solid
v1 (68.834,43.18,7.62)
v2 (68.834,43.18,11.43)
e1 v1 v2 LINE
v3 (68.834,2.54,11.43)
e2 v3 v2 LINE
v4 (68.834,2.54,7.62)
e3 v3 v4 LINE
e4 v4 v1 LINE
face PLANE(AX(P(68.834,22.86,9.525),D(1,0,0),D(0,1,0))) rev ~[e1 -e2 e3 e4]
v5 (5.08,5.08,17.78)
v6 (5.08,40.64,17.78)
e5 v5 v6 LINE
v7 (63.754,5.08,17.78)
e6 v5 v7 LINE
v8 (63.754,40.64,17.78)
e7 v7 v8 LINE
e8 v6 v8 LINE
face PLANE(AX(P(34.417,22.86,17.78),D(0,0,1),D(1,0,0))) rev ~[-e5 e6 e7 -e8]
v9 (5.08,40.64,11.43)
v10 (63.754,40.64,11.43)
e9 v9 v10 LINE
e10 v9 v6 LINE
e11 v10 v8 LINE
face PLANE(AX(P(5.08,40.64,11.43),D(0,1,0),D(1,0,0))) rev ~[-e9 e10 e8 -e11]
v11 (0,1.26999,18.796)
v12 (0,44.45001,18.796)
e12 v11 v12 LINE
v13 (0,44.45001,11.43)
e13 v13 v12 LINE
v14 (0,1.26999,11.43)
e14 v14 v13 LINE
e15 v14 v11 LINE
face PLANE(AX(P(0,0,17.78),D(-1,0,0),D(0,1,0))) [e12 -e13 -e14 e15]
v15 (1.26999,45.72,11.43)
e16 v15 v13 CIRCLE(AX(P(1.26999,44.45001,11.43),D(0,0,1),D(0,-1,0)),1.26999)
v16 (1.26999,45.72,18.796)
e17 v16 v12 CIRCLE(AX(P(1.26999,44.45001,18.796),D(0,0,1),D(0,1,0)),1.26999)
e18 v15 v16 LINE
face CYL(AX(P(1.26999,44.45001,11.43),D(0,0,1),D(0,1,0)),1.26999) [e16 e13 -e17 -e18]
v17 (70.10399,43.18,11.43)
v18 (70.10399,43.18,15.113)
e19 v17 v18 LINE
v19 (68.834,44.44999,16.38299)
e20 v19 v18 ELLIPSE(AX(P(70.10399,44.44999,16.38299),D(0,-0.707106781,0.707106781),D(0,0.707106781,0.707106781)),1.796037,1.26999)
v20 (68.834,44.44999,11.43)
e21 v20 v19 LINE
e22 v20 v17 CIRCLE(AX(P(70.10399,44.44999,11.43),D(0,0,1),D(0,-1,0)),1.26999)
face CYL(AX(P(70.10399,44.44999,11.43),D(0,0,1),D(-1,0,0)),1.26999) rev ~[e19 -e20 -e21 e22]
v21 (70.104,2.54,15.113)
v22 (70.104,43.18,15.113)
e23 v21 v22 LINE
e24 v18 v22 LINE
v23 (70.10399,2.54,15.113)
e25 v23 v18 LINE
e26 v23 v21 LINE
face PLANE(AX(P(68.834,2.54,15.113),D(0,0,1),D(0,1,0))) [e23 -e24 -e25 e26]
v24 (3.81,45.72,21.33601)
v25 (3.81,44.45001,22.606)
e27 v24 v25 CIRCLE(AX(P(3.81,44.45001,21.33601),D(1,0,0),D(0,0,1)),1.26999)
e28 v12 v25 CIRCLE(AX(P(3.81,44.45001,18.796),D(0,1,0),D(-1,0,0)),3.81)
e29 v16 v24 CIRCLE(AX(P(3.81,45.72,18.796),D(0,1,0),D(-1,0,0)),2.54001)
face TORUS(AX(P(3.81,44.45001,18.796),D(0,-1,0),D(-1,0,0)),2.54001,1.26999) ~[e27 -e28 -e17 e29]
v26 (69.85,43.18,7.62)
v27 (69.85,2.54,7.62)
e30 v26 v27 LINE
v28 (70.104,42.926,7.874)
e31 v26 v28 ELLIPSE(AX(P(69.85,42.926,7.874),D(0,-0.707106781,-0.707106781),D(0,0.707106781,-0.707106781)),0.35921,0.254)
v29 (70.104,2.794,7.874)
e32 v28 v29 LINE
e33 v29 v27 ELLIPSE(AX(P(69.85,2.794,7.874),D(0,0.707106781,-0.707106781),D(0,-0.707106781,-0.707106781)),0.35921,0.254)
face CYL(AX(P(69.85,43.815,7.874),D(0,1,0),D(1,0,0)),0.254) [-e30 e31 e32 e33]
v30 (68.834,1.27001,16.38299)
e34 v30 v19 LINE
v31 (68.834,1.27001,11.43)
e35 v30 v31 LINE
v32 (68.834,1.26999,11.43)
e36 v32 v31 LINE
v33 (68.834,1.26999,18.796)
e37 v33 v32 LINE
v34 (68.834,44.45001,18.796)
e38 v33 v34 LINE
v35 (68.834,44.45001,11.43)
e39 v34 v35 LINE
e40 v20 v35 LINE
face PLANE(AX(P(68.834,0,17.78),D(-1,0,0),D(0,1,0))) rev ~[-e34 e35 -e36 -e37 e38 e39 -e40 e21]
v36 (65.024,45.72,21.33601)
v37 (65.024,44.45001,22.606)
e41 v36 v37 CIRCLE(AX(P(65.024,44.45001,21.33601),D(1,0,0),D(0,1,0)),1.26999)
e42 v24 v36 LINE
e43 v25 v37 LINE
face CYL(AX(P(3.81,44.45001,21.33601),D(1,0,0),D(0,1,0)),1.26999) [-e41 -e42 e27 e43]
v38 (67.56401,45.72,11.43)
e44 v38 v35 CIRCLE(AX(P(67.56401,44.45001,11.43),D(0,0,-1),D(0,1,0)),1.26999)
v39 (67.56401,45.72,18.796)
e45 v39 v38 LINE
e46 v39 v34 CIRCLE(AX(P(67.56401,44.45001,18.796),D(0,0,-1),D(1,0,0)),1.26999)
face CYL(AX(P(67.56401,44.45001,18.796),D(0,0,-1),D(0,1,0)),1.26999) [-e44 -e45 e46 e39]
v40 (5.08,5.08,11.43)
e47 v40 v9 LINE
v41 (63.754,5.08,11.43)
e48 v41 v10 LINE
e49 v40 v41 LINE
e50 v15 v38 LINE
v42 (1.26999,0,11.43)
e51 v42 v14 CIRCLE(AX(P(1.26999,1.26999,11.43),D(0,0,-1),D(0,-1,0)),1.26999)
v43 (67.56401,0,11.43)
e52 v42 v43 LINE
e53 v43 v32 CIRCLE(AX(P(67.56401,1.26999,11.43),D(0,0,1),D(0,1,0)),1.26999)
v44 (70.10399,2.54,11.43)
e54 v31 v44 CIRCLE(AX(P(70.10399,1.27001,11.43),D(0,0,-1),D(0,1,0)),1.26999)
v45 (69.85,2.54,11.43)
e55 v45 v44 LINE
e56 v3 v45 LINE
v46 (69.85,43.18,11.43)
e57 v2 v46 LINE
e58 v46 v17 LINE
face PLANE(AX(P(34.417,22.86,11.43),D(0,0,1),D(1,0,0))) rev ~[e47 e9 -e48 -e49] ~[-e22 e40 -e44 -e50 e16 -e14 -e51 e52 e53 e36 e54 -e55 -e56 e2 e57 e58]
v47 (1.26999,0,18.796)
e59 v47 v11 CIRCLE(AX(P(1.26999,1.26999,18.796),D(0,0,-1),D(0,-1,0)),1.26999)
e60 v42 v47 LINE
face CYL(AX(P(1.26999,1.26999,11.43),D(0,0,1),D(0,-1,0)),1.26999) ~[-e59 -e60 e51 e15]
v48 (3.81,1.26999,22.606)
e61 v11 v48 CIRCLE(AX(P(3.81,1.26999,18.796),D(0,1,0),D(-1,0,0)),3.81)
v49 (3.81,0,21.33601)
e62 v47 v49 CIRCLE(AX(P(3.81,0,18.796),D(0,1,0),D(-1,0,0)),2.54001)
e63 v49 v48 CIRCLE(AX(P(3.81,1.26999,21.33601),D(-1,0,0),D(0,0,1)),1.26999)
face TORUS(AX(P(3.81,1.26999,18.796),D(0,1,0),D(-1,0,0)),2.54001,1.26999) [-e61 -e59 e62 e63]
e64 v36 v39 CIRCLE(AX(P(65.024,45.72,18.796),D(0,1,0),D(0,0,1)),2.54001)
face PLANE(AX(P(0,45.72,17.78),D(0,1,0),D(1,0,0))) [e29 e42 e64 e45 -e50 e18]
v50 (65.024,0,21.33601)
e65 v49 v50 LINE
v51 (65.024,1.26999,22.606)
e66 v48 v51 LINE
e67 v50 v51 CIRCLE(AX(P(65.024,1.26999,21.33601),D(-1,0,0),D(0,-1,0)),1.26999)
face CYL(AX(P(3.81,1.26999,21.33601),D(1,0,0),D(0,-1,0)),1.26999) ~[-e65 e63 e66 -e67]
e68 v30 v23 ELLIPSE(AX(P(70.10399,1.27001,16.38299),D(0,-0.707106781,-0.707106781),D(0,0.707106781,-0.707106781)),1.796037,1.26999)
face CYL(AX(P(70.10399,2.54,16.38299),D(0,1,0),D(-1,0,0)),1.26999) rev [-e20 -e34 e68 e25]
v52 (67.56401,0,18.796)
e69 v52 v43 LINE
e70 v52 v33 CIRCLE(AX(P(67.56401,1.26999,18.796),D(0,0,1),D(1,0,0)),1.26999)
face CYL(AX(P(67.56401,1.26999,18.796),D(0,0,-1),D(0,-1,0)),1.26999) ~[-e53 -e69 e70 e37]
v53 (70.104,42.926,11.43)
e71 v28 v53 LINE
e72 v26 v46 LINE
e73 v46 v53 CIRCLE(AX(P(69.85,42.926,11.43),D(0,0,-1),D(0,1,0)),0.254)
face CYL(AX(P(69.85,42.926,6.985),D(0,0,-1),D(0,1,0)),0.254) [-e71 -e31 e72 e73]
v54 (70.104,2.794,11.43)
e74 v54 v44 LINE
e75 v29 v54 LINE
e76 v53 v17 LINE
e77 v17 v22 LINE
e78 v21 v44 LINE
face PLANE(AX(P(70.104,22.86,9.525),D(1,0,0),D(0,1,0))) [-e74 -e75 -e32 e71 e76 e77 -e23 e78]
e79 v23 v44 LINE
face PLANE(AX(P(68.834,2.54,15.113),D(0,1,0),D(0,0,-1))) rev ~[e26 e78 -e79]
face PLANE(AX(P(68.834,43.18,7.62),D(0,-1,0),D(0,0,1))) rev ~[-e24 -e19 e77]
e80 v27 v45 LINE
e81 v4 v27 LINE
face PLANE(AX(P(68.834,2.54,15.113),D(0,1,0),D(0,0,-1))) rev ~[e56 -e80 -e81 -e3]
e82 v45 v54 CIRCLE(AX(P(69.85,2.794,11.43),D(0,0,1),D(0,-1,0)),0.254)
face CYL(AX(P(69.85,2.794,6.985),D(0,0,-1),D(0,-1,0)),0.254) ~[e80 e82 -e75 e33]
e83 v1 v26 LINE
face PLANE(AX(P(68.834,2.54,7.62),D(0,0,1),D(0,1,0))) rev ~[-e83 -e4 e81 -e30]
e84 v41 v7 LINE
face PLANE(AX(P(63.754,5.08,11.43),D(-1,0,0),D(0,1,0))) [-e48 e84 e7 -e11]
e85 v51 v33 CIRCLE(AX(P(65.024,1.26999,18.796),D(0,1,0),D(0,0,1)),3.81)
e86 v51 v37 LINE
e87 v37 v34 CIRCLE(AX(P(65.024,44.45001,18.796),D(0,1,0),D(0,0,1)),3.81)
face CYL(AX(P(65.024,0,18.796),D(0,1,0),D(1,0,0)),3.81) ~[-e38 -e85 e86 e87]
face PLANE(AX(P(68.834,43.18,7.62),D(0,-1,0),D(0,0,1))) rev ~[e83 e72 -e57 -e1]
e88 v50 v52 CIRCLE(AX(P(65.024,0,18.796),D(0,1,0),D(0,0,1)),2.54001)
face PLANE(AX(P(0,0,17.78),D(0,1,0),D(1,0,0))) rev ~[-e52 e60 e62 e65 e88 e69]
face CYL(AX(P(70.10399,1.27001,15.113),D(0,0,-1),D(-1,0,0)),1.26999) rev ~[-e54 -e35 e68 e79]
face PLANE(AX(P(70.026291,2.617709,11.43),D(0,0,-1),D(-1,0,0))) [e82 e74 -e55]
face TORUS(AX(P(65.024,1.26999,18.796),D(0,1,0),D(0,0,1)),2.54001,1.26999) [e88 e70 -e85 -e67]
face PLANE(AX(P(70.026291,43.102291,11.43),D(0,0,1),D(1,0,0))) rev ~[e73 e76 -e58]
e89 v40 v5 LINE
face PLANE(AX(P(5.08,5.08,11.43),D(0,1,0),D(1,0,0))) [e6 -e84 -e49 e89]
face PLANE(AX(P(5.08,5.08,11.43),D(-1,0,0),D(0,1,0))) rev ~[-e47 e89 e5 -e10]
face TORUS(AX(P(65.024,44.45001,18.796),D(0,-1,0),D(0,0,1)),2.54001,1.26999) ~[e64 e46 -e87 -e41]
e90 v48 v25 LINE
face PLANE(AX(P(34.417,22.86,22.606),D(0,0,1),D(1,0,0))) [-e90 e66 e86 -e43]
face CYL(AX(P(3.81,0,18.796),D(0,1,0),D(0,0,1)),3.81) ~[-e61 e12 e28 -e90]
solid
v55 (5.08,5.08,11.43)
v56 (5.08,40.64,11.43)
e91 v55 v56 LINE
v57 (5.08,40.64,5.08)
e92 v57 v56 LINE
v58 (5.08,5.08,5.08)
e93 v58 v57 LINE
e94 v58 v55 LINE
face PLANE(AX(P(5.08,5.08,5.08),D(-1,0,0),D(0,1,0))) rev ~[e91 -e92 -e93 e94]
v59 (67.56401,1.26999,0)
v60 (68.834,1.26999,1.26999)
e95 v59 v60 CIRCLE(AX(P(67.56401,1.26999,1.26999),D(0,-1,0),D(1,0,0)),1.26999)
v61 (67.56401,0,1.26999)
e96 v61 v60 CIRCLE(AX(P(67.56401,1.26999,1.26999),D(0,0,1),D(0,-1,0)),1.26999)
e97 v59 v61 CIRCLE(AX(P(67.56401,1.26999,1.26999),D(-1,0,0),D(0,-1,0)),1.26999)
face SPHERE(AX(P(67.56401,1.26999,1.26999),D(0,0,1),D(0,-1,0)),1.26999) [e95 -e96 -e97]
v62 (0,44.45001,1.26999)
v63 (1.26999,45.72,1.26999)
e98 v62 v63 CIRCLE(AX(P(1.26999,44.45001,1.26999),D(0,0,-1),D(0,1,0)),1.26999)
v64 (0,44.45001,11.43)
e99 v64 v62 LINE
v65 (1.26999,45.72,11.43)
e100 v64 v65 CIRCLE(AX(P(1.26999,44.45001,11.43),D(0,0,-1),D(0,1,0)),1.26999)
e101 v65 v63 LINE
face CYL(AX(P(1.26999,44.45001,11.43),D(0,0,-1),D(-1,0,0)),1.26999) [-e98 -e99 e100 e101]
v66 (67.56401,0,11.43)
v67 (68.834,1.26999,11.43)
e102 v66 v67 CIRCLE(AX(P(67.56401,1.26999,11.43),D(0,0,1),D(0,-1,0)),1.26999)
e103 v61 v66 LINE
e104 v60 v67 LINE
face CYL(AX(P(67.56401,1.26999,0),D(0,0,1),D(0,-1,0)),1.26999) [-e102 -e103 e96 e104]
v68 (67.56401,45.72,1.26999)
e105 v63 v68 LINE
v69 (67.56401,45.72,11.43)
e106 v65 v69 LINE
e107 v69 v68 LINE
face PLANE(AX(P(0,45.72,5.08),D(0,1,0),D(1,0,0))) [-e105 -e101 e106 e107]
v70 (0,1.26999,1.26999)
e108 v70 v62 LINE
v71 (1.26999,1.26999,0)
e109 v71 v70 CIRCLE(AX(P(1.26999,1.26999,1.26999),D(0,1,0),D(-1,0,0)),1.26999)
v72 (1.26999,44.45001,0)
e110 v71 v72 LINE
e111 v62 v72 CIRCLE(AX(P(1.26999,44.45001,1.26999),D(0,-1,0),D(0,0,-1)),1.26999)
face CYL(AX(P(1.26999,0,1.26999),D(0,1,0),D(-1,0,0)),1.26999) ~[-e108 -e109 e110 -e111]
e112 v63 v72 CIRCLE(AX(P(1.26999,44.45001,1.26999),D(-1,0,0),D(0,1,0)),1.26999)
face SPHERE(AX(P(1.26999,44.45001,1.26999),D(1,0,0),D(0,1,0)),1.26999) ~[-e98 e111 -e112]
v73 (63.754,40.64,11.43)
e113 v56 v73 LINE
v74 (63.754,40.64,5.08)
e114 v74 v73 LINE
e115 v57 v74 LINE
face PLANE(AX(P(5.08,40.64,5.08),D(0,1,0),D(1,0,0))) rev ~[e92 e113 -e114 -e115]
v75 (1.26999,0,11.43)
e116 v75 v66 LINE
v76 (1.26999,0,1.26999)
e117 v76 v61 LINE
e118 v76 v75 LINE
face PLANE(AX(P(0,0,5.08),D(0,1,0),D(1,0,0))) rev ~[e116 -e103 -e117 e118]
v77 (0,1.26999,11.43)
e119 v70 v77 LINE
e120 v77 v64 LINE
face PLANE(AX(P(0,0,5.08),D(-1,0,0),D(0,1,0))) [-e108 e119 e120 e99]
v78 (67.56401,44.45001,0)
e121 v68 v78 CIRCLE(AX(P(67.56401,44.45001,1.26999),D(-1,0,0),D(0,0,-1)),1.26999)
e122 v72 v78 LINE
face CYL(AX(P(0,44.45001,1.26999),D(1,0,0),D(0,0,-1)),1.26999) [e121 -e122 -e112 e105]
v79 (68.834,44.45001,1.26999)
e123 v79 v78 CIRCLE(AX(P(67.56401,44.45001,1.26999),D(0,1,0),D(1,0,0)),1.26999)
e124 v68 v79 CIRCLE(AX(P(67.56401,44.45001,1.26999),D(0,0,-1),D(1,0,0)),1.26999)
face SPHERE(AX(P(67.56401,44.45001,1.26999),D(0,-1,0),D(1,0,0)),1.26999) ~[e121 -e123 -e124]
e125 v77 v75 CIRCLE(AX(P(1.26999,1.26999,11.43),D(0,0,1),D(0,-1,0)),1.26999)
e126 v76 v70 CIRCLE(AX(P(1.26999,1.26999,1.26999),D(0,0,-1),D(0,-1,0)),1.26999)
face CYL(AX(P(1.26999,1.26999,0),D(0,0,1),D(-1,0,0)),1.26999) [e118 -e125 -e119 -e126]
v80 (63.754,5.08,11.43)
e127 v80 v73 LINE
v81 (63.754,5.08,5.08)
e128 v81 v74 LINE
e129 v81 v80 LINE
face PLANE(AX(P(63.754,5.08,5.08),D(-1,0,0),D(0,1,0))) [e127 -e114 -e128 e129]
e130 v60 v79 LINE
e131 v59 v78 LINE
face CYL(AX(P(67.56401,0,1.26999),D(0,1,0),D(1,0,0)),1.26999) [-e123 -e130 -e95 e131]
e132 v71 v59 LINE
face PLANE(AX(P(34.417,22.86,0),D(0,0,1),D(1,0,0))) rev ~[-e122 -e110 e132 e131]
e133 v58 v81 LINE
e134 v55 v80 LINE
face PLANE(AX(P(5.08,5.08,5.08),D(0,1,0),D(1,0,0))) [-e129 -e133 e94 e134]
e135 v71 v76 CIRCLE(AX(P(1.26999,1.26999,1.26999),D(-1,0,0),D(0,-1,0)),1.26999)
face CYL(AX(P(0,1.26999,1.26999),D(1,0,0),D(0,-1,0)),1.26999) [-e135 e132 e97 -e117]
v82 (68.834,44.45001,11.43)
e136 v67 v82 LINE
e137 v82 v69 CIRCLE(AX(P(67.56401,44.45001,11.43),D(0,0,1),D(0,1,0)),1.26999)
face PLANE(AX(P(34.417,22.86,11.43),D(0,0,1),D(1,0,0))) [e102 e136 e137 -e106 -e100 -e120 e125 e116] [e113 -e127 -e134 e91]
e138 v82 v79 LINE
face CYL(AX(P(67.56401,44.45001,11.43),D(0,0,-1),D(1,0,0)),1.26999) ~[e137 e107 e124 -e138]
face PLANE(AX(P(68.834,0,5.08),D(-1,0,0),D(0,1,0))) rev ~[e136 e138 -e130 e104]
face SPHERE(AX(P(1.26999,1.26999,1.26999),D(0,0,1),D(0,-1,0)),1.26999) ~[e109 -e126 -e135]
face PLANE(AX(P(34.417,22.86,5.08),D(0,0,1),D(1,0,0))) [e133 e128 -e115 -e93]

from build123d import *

# Parameters (mm, degrees)
F0_W         = 68.834
F0_H         = 45.72
F1_DEPTH     = 5.08
F2_W         = 68.834
F2_H         = 45.72
F2_W_2       = 58.674
F2_H_2       = 35.56
F3_DEPTH     = 6.35
F4_W         = 68.834
F4_H         = 45.72
F4_W_2       = 58.674
F4_H_2       = 35.56
F5_DEPTH     = 6.35
F6_W         = 68.834
F6_H         = 45.72
F7_DEPTH     = 4.826
F8_W         = 40.64
F8_H         = 3.81
F8_H_2       = 3.683
F9_DEPTH     = 1.27
F10_R        = 3.81
F11_R        = 1.26999
F11_2_R      = 1.26999
F12_T1_DEPTH = 4.4450001001
F12_T3_DEPTH = 41.91


# Not quite as in the source:
# - a fillet or chamfer that OpenCascade refuses, or shapes differently, is made with other operations: its cross-section is extruded or revolved along the edge and cut away or added
# - a fillet or chamfer is up to 0.001 mm smaller than in the source, because OpenCascade refuses the exact size
# - a feature names something its author has since deleted; it is built from what else it names


with BuildPart() as f1:
    # F0 (on Top) → F1 (new body)
    with BuildSketch(Plane.XY):
        with Locations((34.417, 22.86)):
            Rectangle(F0_W, F0_H)
    extrude(amount=F1_DEPTH)

    # F2 (on face) → F3 (join)
    with BuildSketch(Plane.XY.offset(5.08)):
        with Locations((34.417, 22.86)):
            Rectangle(F2_W, F2_H)
        with Locations((34.417, 22.86)):
            Rectangle(F2_W_2, F2_H_2, mode=Mode.SUBTRACT)
    extrude(amount=F3_DEPTH)

    # F11 (radius 1.27 in the source; OpenCascade refuses exactly that, so slightly less here)
    f11_edges = [f1.edges().sort_by_distance(p)[0] for p in [
        (68.834, 0, 5.715),
        (0, 0, 5.715),
        (34.417, 0, 0),
        (68.834, 22.86, 0),
        (68.834, 45.72, 5.715),
        (34.417, 45.72, 0),
        (0, 45.72, 5.715),
        (0, 22.86, 0),
    ]]
    fillet(f11_edges, radius=F11_R)


with BuildPart() as f5:
    # F4 (on face) → F5 (new body)
    with BuildSketch(Plane.XY.offset(11.43)):
        with Locations((34.417, 22.86)):
            Rectangle(F4_W, F4_H)
        with Locations((34.417, 22.86)):
            Rectangle(F4_W_2, F4_H_2, mode=Mode.SUBTRACT)
    extrude(amount=F5_DEPTH)

    # F6 (on face) → F7 (join)
    with BuildSketch(Plane.XY.offset(17.78)):
        with Locations((34.417, 22.86)):
            Rectangle(F6_W, F6_H)
    extrude(amount=F7_DEPTH)

    # F8 (on face) → F9 (join)
    with BuildSketch(Plane.YZ.offset(68.834)):
        with Locations((22.86, 9.525)):
            Rectangle(F8_W, F8_H)
        with Locations((22.86, 13.2715)):
            Rectangle(F8_W, F8_H_2)
    extrude(amount=F9_DEPTH)

    # F10
    f10_edges = [f5.edges().sort_by_distance(p)[0] for p in [
        (68.834, 22.86, 22.606),
        (0, 22.86, 22.606),
    ]]
    fillet(f10_edges, radius=F10_R)

    # F11#2 (radius 1.27 in the source; OpenCascade refuses exactly that, so slightly less here)
    f11_2_edges = [f5.edges().sort_by_distance(p)[0] for p in [
        (34.417, 0, 22.606),
        (34.417, 45.72, 22.606),
        (68.834, 22.86, 15.113),
        (68.834, 2.54, 13.2715),
        (68.834, 43.18, 13.2715),
        (68.834, 45.72, 15.113),
        (67.718077, 45.72, 21.490077),
        (0, 45.72, 15.113),
        (1.115923, 45.72, 21.490077),
        (68.834, 0, 15.113),
        (67.718077, 0, 21.490077),
        (0, 0, 15.113),
        (1.115923, 0, 21.490077),
    ]]
    fillet(f11_2_edges, radius=F11_2_R)

    # F12: fillet of radius 0.254 on 7 edges, made by hand

    # F12_s2 → F12_t1 (cut)
    with BuildSketch(Plane.XY.offset(6.985)):
        with BuildLine():
            ThreePointArc((69.85, 2.54), (70.0296051224, 2.6143948776), (70.104, 2.794))
            Line((70.104, 2.794), (70.104, 2.54))
            Line((70.104, 2.54), (69.85, 2.54))
        make_face()
        with BuildLine():
            ThreePointArc((69.85, 43.18), (70.0296051224, 43.1056051224), (70.104, 42.926))
            Line((70.104, 42.926), (70.104, 43.18))
            Line((70.104, 43.18), (69.85, 43.18))
        make_face()
    extrude(amount=F12_T1_DEPTH, mode=Mode.SUBTRACT)

    # F12_s4 → F12_t3 (cut)
    with BuildSketch(Plane.XZ.offset(-43.815)):
        with BuildLine():
            ThreePointArc((70.104, 7.874), (70.0296051224, 7.6943948776), (69.85, 7.62))
            Line((69.85, 7.62), (70.104, 7.62))
            Line((70.104, 7.62), (70.104, 7.874))
        make_face()
    extrude(amount=F12_T3_DEPTH, mode=Mode.SUBTRACT)


solid = Compound([f1.part, f5.part])
